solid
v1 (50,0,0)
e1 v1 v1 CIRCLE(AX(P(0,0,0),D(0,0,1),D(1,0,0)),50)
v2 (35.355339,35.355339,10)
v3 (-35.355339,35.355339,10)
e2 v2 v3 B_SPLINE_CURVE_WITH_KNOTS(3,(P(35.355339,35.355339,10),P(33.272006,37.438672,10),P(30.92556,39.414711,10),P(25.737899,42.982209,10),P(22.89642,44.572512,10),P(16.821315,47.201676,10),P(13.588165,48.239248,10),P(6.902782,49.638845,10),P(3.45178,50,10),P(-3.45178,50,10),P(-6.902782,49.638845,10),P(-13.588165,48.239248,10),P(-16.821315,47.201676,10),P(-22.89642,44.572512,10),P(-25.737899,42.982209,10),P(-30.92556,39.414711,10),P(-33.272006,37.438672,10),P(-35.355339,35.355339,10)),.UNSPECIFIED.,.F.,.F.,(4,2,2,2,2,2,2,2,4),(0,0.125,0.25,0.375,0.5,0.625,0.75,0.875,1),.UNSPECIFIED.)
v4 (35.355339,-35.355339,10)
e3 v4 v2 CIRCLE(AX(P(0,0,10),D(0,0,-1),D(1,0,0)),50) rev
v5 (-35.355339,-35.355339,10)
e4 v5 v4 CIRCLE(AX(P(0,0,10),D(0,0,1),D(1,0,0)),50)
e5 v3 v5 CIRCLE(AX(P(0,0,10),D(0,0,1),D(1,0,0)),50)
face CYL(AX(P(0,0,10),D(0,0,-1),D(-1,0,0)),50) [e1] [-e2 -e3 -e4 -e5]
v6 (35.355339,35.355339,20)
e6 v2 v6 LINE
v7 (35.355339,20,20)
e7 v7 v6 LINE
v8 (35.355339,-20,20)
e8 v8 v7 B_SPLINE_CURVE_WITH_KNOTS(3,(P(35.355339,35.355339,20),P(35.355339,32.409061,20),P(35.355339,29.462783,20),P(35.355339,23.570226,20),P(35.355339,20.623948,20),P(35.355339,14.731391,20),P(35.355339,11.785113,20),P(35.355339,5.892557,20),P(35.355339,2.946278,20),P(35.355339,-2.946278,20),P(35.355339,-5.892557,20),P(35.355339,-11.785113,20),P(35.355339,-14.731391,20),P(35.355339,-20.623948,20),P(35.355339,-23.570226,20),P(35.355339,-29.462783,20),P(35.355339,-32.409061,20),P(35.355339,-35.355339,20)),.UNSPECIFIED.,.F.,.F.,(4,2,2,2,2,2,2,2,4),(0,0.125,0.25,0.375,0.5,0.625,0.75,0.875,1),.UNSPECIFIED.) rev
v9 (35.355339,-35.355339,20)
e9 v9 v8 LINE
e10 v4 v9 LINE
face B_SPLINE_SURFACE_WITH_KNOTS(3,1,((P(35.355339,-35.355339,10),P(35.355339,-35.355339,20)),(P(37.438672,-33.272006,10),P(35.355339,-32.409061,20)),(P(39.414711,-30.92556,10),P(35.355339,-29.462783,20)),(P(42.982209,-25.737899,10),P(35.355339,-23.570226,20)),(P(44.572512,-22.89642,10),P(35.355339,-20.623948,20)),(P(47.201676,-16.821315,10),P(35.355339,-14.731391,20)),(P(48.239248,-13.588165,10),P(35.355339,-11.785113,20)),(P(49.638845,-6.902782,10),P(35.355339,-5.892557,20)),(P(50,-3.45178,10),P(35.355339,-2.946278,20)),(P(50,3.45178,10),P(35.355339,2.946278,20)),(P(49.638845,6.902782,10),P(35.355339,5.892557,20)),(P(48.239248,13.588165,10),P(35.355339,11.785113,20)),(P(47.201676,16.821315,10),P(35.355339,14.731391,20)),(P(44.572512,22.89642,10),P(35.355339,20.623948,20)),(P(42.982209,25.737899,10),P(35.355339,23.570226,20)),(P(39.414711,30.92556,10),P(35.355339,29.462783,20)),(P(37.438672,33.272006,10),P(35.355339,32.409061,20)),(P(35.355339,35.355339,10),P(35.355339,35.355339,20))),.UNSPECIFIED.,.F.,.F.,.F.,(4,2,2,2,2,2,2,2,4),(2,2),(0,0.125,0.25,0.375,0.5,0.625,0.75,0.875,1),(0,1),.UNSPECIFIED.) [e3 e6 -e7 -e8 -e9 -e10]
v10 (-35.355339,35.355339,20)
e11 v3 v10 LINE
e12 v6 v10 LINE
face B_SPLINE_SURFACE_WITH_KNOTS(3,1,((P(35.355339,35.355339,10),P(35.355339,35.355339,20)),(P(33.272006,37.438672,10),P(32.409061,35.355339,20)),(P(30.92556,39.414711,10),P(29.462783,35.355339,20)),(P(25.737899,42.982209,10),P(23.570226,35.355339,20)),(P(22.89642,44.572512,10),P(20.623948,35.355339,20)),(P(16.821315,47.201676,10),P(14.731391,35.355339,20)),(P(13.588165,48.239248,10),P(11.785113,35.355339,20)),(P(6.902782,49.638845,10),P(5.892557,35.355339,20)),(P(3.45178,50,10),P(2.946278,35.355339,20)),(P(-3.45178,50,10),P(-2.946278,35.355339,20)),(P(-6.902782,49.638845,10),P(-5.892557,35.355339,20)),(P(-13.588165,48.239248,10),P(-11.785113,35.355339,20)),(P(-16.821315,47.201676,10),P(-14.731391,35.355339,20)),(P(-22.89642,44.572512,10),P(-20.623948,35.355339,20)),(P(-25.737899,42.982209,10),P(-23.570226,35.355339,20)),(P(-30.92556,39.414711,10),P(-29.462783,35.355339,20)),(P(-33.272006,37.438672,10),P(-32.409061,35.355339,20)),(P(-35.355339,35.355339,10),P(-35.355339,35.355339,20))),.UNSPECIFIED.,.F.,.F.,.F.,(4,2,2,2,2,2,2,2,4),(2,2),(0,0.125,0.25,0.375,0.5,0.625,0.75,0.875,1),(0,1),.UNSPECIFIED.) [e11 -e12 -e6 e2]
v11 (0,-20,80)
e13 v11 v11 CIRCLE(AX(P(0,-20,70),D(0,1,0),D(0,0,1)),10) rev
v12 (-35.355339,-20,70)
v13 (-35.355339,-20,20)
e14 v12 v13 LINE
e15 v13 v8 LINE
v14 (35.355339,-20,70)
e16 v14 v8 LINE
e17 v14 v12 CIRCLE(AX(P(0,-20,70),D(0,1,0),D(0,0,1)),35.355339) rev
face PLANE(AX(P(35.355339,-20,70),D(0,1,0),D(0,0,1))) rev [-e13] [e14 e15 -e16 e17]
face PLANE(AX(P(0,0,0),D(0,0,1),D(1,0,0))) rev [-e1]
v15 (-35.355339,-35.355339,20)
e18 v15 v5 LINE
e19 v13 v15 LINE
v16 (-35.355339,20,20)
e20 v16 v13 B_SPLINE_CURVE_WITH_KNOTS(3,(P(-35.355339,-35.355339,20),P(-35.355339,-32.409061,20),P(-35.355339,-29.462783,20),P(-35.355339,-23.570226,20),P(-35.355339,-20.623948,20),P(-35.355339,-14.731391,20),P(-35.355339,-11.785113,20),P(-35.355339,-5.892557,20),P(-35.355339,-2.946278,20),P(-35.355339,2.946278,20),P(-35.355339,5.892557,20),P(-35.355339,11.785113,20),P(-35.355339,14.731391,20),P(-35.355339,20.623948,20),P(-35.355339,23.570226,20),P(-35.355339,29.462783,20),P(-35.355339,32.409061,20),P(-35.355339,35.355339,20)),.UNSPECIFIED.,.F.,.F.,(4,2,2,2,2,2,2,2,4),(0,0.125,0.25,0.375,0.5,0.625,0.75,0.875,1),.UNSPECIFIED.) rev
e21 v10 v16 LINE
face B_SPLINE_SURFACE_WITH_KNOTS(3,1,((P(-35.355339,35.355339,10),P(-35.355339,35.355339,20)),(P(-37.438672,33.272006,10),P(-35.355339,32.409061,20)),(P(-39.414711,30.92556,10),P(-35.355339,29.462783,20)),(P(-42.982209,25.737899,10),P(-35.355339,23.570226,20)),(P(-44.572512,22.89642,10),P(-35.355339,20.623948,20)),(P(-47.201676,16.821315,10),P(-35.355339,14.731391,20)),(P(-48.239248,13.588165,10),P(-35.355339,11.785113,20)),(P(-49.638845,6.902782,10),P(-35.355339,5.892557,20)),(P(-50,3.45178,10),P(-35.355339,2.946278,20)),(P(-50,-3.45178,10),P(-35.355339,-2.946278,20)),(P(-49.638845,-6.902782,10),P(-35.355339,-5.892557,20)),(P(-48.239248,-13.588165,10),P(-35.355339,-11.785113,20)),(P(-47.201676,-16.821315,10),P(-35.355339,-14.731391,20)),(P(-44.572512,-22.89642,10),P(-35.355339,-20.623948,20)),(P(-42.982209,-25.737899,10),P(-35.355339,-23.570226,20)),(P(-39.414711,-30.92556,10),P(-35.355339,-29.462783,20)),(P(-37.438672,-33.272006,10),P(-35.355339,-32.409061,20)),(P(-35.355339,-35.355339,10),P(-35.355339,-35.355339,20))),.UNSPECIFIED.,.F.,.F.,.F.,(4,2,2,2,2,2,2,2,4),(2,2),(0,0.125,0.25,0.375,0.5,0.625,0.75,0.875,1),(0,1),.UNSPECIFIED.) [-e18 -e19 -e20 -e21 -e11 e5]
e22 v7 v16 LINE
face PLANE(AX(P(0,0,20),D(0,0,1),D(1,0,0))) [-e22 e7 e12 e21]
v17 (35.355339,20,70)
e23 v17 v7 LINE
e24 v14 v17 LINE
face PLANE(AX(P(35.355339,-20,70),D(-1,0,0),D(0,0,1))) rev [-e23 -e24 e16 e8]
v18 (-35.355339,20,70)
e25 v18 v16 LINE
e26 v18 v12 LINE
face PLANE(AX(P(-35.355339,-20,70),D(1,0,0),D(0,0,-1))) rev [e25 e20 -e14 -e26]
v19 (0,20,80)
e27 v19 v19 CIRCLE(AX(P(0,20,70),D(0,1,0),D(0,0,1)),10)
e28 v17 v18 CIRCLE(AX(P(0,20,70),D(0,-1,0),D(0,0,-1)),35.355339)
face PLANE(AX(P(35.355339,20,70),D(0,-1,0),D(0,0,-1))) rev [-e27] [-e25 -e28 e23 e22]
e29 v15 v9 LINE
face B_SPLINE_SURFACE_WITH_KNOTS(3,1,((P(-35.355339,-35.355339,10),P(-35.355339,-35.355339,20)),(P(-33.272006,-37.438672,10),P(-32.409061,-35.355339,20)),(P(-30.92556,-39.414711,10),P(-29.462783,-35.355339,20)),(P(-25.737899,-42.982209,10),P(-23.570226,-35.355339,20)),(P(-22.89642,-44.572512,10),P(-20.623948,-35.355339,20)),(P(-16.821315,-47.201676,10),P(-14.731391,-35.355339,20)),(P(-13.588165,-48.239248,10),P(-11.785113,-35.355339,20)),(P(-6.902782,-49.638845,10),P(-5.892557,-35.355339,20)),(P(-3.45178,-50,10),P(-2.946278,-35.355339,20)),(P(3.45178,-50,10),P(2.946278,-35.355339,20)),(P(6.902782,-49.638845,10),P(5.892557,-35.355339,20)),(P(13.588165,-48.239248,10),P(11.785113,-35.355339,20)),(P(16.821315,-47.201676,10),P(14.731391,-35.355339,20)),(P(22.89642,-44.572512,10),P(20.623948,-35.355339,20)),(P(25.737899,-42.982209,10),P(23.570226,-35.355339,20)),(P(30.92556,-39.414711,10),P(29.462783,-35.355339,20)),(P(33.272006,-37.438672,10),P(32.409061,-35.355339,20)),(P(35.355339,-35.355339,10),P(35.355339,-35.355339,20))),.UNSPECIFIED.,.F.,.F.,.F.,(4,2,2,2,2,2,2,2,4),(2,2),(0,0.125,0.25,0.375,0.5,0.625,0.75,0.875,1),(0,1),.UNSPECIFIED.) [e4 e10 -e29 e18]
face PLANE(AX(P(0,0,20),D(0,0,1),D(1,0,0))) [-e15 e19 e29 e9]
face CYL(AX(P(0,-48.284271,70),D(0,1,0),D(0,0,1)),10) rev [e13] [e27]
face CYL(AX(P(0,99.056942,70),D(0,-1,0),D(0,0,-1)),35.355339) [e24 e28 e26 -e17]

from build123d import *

# Parameters (mm, degrees)
SKETCH1_R                       = 50
BOSS_EXTRUDE1_DEPTH             = 10
SKETCH3_W                       = 70.710678118
SKETCH3_H                       = 40
BOSS_EXTRUDE2_DEPTH             = 50
BOSS_EXTRUDE3_REACH             = 101.499
BOSS_EXTRUDE3_DIRECTION_2_REACH = 101.499
SKETCH5_R                       = 10
CUT_EXTRUDE1_DEPTH              = 40


with BuildPart() as part:
    # Sketch1 → Boss-Extrude1 (new body)
    with BuildSketch(Plane.XY):
        Circle(SKETCH1_R)
    extrude(amount=BOSS_EXTRUDE1_DEPTH)

    # Loft1: read off the stored shape, not the designer's step
    # Loft1: loft between two sections, ruled curve by curve
    loft1_from = [
        Edge.make_bspline([(-35.355339059, -35.355339059, 10), (-33.272005726, -37.438672393, 10), (-30.925559549, -39.414711482, 10), (-25.737899021, -42.982208745, 10), (-22.896419748, -44.572511855, 10), (-16.821315002, -47.201675945, 10), (-13.588165153, -48.239248246, 10), (-6.902782293, -49.63884467, 10), (-3.451779686, -50, 10), (3.451779686, -50, 10), (6.902782293, -49.63884467, 10), (13.588165153, -48.239248246, 10), (16.821315002, -47.201675945, 10), (22.896419748, -44.572511855, 10), (25.737899021, -42.982208745, 10), (30.925559549, -39.414711482, 10), (33.272005726, -37.438672393, 10), (35.355339059, -35.355339059, 10)], [0, 0, 0, 0, 0.125, 0.125, 0.25, 0.25, 0.375, 0.375, 0.5, 0.5, 0.625, 0.625, 0.75, 0.75, 0.875, 0.875, 1, 1, 1, 1], 3),
        Edge.make_bspline([(35.355339059, -35.355339059, 10), (37.438672393, -33.272005726, 10), (39.414711482, -30.925559549, 10), (42.982208745, -25.737899021, 10), (44.572511855, -22.896419748, 10), (47.201675945, -16.821315002, 10), (48.239248246, -13.588165153, 10), (49.63884467, -6.902782293, 10), (50, -3.451779686, 10), (50, 3.451779686, 10), (49.63884467, 6.902782293, 10), (48.239248246, 13.588165153, 10), (47.201675945, 16.821315002, 10), (44.572511855, 22.896419748, 10), (42.982208745, 25.737899021, 10), (39.414711482, 30.925559549, 10), (37.438672393, 33.272005726, 10), (35.355339059, 35.355339059, 10)], [0, 0, 0, 0, 0.125, 0.125, 0.25, 0.25, 0.375, 0.375, 0.5, 0.5, 0.625, 0.625, 0.75, 0.75, 0.875, 0.875, 1, 1, 1, 1], 3),
        Edge.make_bspline([(-35.355339059, 35.355339059, 10), (-37.438672393, 33.272005726, 10), (-39.414711482, 30.925559549, 10), (-42.982208745, 25.737899021, 10), (-44.572511855, 22.896419748, 10), (-47.201675945, 16.821315002, 10), (-48.239248246, 13.588165153, 10), (-49.63884467, 6.902782293, 10), (-50, 3.451779686, 10), (-50, -3.451779686, 10), (-49.63884467, -6.902782293, 10), (-48.239248246, -13.588165153, 10), (-47.201675945, -16.821315002, 10), (-44.572511855, -22.896419748, 10), (-42.982208745, -25.737899021, 10), (-39.414711482, -30.925559549, 10), (-37.438672393, -33.272005726, 10), (-35.355339059, -35.355339059, 10)], [0, 0, 0, 0, 0.125, 0.125, 0.25, 0.25, 0.375, 0.375, 0.5, 0.5, 0.625, 0.625, 0.75, 0.75, 0.875, 0.875, 1, 1, 1, 1], 3),
        Edge.make_bspline([(35.355339059, 35.355339059, 10), (33.272005726, 37.438672393, 10), (30.925559549, 39.414711482, 10), (25.737899021, 42.982208745, 10), (22.896419748, 44.572511855, 10), (16.821315002, 47.201675945, 10), (13.588165153, 48.239248246, 10), (6.902782293, 49.63884467, 10), (3.451779686, 50, 10), (-3.451779686, 50, 10), (-6.902782293, 49.63884467, 10), (-13.588165153, 48.239248246, 10), (-16.821315002, 47.201675945, 10), (-22.896419748, 44.572511855, 10), (-25.737899021, 42.982208745, 10), (-30.925559549, 39.414711482, 10), (-33.272005726, 37.438672393, 10), (-35.355339059, 35.355339059, 10)], [0, 0, 0, 0, 0.125, 0.125, 0.25, 0.25, 0.375, 0.375, 0.5, 0.5, 0.625, 0.625, 0.75, 0.75, 0.875, 0.875, 1, 1, 1, 1], 3),
    ]
    loft1_to = [
        Edge.make_bspline([(-35.355339059, -35.355339059, 20), (-32.409060804, -35.355339059, 20), (-29.462782549, -35.355339059, 20), (-23.57022604, -35.355339059, 20), (-20.623947785, -35.355339059, 20), (-14.731391275, -35.355339059, 20), (-11.78511302, -35.355339059, 20), (-5.89255651, -35.355339059, 20), (-2.946278255, -35.355339059, 20), (2.946278255, -35.355339059, 20), (5.89255651, -35.355339059, 20), (11.78511302, -35.355339059, 20), (14.731391275, -35.355339059, 20), (20.623947785, -35.355339059, 20), (23.57022604, -35.355339059, 20), (29.462782549, -35.355339059, 20), (32.409060804, -35.355339059, 20), (35.355339059, -35.355339059, 20)], [0, 0, 0, 0, 0.125, 0.125, 0.25, 0.25, 0.375, 0.375, 0.5, 0.5, 0.625, 0.625, 0.75, 0.75, 0.875, 0.875, 1, 1, 1, 1], 3),
        Edge.make_bspline([(35.355339059, -35.355339059, 20), (35.355339059, -32.409060804, 20), (35.355339059, -29.462782549, 20), (35.355339059, -23.57022604, 20), (35.355339059, -20.623947785, 20), (35.355339059, -14.731391275, 20), (35.355339059, -11.78511302, 20), (35.355339059, -5.89255651, 20), (35.355339059, -2.946278255, 20), (35.355339059, 2.946278255, 20), (35.355339059, 5.89255651, 20), (35.355339059, 11.78511302, 20), (35.355339059, 14.731391275, 20), (35.355339059, 20.623947785, 20), (35.355339059, 23.57022604, 20), (35.355339059, 29.462782549, 20), (35.355339059, 32.409060804, 20), (35.355339059, 35.355339059, 20)], [0, 0, 0, 0, 0.125, 0.125, 0.25, 0.25, 0.375, 0.375, 0.5, 0.5, 0.625, 0.625, 0.75, 0.75, 0.875, 0.875, 1, 1, 1, 1], 3),
        Edge.make_bspline([(-35.355339059, 35.355339059, 20), (-35.355339059, 32.409060804, 20), (-35.355339059, 29.462782549, 20), (-35.355339059, 23.57022604, 20), (-35.355339059, 20.623947785, 20), (-35.355339059, 14.731391275, 20), (-35.355339059, 11.78511302, 20), (-35.355339059, 5.89255651, 20), (-35.355339059, 2.946278255, 20), (-35.355339059, -2.946278255, 20), (-35.355339059, -5.89255651, 20), (-35.355339059, -11.78511302, 20), (-35.355339059, -14.731391275, 20), (-35.355339059, -20.623947785, 20), (-35.355339059, -23.57022604, 20), (-35.355339059, -29.462782549, 20), (-35.355339059, -32.409060804, 20), (-35.355339059, -35.355339059, 20)], [0, 0, 0, 0, 0.125, 0.125, 0.25, 0.25, 0.375, 0.375, 0.5, 0.5, 0.625, 0.625, 0.75, 0.75, 0.875, 0.875, 1, 1, 1, 1], 3),
        Edge.make_bspline([(35.355339059, 35.355339059, 20), (32.409060804, 35.355339059, 20), (29.462782549, 35.355339059, 20), (23.57022604, 35.355339059, 20), (20.623947785, 35.355339059, 20), (14.731391275, 35.355339059, 20), (11.78511302, 35.355339059, 20), (5.89255651, 35.355339059, 20), (2.946278255, 35.355339059, 20), (-2.946278255, 35.355339059, 20), (-5.89255651, 35.355339059, 20), (-11.78511302, 35.355339059, 20), (-14.731391275, 35.355339059, 20), (-20.623947785, 35.355339059, 20), (-23.57022604, 35.355339059, 20), (-29.462782549, 35.355339059, 20), (-32.409060804, 35.355339059, 20), (-35.355339059, 35.355339059, 20)], [0, 0, 0, 0, 0.125, 0.125, 0.25, 0.25, 0.375, 0.375, 0.5, 0.5, 0.625, 0.625, 0.75, 0.75, 0.875, 0.875, 1, 1, 1, 1], 3),
    ]
    loft1 = Solid(Shell([*[Face.make_surface_from_curves(loft1_from[k], loft1_to[k]) for k in range(4)], Face(Wire(loft1_from)), Face(Wire(loft1_to))]))
    add(loft1)

    # Sketch3 → Boss-Extrude2 (add)
    with BuildSketch(Plane.XY.offset(20)):
        Rectangle(SKETCH3_W, SKETCH3_H)
    extrude(amount=BOSS_EXTRUDE2_DEPTH)

    # Boss-Extrude3: up to this face of the body (flat: up to its plane)
    boss_extrude3_end = Plane(part.part.faces().sort_by_distance((0, 20, 45))[0])
    # Sketch4 → Boss-Extrude3 (add, up to the picked face)
    with BuildSketch(Plane(origin=(0, 0, 0), x_dir=(1, 0, 0), z_dir=(0, 1, 0)), mode=Mode.PRIVATE) as boss_extrude3_sk1:
        with BuildLine():
            Line((35.355339059, -70), (-35.355339059, -70))
            ThreePointArc((-35.355339059, -70), (0, -105.355339059), (35.355339059, -70))
        make_face()
    boss_extrude3_tool1 = split(extrude(boss_extrude3_sk1.sketch, amount=BOSS_EXTRUDE3_REACH, mode=Mode.PRIVATE), bisect_by=boss_extrude3_end, keep=Keep.BOTH, mode=Mode.PRIVATE)
    add(boss_extrude3_tool1.solids().sort_by(Axis((0, 0, 85.005272), (0, 1, 0)))[0])

    # Boss-Extrude3 direction 2: up to this face of the body (flat: up to its plane)
    boss_extrude3_direction_2_end = Plane(part.part.faces().sort_by_distance((0, -20, 45))[0])
    # Sketch4 → Boss-Extrude3 direction 2 (add, up to the picked face)
    with BuildSketch(Plane(origin=(0, 0, 0), x_dir=(1, 0, 0), z_dir=(0, 1, 0)), mode=Mode.PRIVATE) as boss_extrude3_direction_2_sk1:
        with BuildLine():
            Line((35.355339059, -70), (-35.355339059, -70))
            ThreePointArc((-35.355339059, -70), (0, -105.355339059), (35.355339059, -70))
        make_face()
    boss_extrude3_direction_2_tool1 = split(extrude(boss_extrude3_direction_2_sk1.sketch, amount=-BOSS_EXTRUDE3_DIRECTION_2_REACH, mode=Mode.PRIVATE), bisect_by=boss_extrude3_direction_2_end, keep=Keep.BOTH, mode=Mode.PRIVATE)
    add(boss_extrude3_direction_2_tool1.solids().sort_by(Axis((0, 0, 85.005272), (0, -1, 0)))[0])

    # Sketch5 → Cut-Extrude1 (cut)
    with BuildSketch(Plane(origin=(0, 20, 0), x_dir=(1, 0, 0), z_dir=(0, 1, 0))):
        with Locations(Location((0, -70, 0), (0, 0, 270))):
            Circle(SKETCH5_R)
    extrude(amount=-CUT_EXTRUDE1_DEPTH, mode=Mode.SUBTRACT)


solid = part.part
